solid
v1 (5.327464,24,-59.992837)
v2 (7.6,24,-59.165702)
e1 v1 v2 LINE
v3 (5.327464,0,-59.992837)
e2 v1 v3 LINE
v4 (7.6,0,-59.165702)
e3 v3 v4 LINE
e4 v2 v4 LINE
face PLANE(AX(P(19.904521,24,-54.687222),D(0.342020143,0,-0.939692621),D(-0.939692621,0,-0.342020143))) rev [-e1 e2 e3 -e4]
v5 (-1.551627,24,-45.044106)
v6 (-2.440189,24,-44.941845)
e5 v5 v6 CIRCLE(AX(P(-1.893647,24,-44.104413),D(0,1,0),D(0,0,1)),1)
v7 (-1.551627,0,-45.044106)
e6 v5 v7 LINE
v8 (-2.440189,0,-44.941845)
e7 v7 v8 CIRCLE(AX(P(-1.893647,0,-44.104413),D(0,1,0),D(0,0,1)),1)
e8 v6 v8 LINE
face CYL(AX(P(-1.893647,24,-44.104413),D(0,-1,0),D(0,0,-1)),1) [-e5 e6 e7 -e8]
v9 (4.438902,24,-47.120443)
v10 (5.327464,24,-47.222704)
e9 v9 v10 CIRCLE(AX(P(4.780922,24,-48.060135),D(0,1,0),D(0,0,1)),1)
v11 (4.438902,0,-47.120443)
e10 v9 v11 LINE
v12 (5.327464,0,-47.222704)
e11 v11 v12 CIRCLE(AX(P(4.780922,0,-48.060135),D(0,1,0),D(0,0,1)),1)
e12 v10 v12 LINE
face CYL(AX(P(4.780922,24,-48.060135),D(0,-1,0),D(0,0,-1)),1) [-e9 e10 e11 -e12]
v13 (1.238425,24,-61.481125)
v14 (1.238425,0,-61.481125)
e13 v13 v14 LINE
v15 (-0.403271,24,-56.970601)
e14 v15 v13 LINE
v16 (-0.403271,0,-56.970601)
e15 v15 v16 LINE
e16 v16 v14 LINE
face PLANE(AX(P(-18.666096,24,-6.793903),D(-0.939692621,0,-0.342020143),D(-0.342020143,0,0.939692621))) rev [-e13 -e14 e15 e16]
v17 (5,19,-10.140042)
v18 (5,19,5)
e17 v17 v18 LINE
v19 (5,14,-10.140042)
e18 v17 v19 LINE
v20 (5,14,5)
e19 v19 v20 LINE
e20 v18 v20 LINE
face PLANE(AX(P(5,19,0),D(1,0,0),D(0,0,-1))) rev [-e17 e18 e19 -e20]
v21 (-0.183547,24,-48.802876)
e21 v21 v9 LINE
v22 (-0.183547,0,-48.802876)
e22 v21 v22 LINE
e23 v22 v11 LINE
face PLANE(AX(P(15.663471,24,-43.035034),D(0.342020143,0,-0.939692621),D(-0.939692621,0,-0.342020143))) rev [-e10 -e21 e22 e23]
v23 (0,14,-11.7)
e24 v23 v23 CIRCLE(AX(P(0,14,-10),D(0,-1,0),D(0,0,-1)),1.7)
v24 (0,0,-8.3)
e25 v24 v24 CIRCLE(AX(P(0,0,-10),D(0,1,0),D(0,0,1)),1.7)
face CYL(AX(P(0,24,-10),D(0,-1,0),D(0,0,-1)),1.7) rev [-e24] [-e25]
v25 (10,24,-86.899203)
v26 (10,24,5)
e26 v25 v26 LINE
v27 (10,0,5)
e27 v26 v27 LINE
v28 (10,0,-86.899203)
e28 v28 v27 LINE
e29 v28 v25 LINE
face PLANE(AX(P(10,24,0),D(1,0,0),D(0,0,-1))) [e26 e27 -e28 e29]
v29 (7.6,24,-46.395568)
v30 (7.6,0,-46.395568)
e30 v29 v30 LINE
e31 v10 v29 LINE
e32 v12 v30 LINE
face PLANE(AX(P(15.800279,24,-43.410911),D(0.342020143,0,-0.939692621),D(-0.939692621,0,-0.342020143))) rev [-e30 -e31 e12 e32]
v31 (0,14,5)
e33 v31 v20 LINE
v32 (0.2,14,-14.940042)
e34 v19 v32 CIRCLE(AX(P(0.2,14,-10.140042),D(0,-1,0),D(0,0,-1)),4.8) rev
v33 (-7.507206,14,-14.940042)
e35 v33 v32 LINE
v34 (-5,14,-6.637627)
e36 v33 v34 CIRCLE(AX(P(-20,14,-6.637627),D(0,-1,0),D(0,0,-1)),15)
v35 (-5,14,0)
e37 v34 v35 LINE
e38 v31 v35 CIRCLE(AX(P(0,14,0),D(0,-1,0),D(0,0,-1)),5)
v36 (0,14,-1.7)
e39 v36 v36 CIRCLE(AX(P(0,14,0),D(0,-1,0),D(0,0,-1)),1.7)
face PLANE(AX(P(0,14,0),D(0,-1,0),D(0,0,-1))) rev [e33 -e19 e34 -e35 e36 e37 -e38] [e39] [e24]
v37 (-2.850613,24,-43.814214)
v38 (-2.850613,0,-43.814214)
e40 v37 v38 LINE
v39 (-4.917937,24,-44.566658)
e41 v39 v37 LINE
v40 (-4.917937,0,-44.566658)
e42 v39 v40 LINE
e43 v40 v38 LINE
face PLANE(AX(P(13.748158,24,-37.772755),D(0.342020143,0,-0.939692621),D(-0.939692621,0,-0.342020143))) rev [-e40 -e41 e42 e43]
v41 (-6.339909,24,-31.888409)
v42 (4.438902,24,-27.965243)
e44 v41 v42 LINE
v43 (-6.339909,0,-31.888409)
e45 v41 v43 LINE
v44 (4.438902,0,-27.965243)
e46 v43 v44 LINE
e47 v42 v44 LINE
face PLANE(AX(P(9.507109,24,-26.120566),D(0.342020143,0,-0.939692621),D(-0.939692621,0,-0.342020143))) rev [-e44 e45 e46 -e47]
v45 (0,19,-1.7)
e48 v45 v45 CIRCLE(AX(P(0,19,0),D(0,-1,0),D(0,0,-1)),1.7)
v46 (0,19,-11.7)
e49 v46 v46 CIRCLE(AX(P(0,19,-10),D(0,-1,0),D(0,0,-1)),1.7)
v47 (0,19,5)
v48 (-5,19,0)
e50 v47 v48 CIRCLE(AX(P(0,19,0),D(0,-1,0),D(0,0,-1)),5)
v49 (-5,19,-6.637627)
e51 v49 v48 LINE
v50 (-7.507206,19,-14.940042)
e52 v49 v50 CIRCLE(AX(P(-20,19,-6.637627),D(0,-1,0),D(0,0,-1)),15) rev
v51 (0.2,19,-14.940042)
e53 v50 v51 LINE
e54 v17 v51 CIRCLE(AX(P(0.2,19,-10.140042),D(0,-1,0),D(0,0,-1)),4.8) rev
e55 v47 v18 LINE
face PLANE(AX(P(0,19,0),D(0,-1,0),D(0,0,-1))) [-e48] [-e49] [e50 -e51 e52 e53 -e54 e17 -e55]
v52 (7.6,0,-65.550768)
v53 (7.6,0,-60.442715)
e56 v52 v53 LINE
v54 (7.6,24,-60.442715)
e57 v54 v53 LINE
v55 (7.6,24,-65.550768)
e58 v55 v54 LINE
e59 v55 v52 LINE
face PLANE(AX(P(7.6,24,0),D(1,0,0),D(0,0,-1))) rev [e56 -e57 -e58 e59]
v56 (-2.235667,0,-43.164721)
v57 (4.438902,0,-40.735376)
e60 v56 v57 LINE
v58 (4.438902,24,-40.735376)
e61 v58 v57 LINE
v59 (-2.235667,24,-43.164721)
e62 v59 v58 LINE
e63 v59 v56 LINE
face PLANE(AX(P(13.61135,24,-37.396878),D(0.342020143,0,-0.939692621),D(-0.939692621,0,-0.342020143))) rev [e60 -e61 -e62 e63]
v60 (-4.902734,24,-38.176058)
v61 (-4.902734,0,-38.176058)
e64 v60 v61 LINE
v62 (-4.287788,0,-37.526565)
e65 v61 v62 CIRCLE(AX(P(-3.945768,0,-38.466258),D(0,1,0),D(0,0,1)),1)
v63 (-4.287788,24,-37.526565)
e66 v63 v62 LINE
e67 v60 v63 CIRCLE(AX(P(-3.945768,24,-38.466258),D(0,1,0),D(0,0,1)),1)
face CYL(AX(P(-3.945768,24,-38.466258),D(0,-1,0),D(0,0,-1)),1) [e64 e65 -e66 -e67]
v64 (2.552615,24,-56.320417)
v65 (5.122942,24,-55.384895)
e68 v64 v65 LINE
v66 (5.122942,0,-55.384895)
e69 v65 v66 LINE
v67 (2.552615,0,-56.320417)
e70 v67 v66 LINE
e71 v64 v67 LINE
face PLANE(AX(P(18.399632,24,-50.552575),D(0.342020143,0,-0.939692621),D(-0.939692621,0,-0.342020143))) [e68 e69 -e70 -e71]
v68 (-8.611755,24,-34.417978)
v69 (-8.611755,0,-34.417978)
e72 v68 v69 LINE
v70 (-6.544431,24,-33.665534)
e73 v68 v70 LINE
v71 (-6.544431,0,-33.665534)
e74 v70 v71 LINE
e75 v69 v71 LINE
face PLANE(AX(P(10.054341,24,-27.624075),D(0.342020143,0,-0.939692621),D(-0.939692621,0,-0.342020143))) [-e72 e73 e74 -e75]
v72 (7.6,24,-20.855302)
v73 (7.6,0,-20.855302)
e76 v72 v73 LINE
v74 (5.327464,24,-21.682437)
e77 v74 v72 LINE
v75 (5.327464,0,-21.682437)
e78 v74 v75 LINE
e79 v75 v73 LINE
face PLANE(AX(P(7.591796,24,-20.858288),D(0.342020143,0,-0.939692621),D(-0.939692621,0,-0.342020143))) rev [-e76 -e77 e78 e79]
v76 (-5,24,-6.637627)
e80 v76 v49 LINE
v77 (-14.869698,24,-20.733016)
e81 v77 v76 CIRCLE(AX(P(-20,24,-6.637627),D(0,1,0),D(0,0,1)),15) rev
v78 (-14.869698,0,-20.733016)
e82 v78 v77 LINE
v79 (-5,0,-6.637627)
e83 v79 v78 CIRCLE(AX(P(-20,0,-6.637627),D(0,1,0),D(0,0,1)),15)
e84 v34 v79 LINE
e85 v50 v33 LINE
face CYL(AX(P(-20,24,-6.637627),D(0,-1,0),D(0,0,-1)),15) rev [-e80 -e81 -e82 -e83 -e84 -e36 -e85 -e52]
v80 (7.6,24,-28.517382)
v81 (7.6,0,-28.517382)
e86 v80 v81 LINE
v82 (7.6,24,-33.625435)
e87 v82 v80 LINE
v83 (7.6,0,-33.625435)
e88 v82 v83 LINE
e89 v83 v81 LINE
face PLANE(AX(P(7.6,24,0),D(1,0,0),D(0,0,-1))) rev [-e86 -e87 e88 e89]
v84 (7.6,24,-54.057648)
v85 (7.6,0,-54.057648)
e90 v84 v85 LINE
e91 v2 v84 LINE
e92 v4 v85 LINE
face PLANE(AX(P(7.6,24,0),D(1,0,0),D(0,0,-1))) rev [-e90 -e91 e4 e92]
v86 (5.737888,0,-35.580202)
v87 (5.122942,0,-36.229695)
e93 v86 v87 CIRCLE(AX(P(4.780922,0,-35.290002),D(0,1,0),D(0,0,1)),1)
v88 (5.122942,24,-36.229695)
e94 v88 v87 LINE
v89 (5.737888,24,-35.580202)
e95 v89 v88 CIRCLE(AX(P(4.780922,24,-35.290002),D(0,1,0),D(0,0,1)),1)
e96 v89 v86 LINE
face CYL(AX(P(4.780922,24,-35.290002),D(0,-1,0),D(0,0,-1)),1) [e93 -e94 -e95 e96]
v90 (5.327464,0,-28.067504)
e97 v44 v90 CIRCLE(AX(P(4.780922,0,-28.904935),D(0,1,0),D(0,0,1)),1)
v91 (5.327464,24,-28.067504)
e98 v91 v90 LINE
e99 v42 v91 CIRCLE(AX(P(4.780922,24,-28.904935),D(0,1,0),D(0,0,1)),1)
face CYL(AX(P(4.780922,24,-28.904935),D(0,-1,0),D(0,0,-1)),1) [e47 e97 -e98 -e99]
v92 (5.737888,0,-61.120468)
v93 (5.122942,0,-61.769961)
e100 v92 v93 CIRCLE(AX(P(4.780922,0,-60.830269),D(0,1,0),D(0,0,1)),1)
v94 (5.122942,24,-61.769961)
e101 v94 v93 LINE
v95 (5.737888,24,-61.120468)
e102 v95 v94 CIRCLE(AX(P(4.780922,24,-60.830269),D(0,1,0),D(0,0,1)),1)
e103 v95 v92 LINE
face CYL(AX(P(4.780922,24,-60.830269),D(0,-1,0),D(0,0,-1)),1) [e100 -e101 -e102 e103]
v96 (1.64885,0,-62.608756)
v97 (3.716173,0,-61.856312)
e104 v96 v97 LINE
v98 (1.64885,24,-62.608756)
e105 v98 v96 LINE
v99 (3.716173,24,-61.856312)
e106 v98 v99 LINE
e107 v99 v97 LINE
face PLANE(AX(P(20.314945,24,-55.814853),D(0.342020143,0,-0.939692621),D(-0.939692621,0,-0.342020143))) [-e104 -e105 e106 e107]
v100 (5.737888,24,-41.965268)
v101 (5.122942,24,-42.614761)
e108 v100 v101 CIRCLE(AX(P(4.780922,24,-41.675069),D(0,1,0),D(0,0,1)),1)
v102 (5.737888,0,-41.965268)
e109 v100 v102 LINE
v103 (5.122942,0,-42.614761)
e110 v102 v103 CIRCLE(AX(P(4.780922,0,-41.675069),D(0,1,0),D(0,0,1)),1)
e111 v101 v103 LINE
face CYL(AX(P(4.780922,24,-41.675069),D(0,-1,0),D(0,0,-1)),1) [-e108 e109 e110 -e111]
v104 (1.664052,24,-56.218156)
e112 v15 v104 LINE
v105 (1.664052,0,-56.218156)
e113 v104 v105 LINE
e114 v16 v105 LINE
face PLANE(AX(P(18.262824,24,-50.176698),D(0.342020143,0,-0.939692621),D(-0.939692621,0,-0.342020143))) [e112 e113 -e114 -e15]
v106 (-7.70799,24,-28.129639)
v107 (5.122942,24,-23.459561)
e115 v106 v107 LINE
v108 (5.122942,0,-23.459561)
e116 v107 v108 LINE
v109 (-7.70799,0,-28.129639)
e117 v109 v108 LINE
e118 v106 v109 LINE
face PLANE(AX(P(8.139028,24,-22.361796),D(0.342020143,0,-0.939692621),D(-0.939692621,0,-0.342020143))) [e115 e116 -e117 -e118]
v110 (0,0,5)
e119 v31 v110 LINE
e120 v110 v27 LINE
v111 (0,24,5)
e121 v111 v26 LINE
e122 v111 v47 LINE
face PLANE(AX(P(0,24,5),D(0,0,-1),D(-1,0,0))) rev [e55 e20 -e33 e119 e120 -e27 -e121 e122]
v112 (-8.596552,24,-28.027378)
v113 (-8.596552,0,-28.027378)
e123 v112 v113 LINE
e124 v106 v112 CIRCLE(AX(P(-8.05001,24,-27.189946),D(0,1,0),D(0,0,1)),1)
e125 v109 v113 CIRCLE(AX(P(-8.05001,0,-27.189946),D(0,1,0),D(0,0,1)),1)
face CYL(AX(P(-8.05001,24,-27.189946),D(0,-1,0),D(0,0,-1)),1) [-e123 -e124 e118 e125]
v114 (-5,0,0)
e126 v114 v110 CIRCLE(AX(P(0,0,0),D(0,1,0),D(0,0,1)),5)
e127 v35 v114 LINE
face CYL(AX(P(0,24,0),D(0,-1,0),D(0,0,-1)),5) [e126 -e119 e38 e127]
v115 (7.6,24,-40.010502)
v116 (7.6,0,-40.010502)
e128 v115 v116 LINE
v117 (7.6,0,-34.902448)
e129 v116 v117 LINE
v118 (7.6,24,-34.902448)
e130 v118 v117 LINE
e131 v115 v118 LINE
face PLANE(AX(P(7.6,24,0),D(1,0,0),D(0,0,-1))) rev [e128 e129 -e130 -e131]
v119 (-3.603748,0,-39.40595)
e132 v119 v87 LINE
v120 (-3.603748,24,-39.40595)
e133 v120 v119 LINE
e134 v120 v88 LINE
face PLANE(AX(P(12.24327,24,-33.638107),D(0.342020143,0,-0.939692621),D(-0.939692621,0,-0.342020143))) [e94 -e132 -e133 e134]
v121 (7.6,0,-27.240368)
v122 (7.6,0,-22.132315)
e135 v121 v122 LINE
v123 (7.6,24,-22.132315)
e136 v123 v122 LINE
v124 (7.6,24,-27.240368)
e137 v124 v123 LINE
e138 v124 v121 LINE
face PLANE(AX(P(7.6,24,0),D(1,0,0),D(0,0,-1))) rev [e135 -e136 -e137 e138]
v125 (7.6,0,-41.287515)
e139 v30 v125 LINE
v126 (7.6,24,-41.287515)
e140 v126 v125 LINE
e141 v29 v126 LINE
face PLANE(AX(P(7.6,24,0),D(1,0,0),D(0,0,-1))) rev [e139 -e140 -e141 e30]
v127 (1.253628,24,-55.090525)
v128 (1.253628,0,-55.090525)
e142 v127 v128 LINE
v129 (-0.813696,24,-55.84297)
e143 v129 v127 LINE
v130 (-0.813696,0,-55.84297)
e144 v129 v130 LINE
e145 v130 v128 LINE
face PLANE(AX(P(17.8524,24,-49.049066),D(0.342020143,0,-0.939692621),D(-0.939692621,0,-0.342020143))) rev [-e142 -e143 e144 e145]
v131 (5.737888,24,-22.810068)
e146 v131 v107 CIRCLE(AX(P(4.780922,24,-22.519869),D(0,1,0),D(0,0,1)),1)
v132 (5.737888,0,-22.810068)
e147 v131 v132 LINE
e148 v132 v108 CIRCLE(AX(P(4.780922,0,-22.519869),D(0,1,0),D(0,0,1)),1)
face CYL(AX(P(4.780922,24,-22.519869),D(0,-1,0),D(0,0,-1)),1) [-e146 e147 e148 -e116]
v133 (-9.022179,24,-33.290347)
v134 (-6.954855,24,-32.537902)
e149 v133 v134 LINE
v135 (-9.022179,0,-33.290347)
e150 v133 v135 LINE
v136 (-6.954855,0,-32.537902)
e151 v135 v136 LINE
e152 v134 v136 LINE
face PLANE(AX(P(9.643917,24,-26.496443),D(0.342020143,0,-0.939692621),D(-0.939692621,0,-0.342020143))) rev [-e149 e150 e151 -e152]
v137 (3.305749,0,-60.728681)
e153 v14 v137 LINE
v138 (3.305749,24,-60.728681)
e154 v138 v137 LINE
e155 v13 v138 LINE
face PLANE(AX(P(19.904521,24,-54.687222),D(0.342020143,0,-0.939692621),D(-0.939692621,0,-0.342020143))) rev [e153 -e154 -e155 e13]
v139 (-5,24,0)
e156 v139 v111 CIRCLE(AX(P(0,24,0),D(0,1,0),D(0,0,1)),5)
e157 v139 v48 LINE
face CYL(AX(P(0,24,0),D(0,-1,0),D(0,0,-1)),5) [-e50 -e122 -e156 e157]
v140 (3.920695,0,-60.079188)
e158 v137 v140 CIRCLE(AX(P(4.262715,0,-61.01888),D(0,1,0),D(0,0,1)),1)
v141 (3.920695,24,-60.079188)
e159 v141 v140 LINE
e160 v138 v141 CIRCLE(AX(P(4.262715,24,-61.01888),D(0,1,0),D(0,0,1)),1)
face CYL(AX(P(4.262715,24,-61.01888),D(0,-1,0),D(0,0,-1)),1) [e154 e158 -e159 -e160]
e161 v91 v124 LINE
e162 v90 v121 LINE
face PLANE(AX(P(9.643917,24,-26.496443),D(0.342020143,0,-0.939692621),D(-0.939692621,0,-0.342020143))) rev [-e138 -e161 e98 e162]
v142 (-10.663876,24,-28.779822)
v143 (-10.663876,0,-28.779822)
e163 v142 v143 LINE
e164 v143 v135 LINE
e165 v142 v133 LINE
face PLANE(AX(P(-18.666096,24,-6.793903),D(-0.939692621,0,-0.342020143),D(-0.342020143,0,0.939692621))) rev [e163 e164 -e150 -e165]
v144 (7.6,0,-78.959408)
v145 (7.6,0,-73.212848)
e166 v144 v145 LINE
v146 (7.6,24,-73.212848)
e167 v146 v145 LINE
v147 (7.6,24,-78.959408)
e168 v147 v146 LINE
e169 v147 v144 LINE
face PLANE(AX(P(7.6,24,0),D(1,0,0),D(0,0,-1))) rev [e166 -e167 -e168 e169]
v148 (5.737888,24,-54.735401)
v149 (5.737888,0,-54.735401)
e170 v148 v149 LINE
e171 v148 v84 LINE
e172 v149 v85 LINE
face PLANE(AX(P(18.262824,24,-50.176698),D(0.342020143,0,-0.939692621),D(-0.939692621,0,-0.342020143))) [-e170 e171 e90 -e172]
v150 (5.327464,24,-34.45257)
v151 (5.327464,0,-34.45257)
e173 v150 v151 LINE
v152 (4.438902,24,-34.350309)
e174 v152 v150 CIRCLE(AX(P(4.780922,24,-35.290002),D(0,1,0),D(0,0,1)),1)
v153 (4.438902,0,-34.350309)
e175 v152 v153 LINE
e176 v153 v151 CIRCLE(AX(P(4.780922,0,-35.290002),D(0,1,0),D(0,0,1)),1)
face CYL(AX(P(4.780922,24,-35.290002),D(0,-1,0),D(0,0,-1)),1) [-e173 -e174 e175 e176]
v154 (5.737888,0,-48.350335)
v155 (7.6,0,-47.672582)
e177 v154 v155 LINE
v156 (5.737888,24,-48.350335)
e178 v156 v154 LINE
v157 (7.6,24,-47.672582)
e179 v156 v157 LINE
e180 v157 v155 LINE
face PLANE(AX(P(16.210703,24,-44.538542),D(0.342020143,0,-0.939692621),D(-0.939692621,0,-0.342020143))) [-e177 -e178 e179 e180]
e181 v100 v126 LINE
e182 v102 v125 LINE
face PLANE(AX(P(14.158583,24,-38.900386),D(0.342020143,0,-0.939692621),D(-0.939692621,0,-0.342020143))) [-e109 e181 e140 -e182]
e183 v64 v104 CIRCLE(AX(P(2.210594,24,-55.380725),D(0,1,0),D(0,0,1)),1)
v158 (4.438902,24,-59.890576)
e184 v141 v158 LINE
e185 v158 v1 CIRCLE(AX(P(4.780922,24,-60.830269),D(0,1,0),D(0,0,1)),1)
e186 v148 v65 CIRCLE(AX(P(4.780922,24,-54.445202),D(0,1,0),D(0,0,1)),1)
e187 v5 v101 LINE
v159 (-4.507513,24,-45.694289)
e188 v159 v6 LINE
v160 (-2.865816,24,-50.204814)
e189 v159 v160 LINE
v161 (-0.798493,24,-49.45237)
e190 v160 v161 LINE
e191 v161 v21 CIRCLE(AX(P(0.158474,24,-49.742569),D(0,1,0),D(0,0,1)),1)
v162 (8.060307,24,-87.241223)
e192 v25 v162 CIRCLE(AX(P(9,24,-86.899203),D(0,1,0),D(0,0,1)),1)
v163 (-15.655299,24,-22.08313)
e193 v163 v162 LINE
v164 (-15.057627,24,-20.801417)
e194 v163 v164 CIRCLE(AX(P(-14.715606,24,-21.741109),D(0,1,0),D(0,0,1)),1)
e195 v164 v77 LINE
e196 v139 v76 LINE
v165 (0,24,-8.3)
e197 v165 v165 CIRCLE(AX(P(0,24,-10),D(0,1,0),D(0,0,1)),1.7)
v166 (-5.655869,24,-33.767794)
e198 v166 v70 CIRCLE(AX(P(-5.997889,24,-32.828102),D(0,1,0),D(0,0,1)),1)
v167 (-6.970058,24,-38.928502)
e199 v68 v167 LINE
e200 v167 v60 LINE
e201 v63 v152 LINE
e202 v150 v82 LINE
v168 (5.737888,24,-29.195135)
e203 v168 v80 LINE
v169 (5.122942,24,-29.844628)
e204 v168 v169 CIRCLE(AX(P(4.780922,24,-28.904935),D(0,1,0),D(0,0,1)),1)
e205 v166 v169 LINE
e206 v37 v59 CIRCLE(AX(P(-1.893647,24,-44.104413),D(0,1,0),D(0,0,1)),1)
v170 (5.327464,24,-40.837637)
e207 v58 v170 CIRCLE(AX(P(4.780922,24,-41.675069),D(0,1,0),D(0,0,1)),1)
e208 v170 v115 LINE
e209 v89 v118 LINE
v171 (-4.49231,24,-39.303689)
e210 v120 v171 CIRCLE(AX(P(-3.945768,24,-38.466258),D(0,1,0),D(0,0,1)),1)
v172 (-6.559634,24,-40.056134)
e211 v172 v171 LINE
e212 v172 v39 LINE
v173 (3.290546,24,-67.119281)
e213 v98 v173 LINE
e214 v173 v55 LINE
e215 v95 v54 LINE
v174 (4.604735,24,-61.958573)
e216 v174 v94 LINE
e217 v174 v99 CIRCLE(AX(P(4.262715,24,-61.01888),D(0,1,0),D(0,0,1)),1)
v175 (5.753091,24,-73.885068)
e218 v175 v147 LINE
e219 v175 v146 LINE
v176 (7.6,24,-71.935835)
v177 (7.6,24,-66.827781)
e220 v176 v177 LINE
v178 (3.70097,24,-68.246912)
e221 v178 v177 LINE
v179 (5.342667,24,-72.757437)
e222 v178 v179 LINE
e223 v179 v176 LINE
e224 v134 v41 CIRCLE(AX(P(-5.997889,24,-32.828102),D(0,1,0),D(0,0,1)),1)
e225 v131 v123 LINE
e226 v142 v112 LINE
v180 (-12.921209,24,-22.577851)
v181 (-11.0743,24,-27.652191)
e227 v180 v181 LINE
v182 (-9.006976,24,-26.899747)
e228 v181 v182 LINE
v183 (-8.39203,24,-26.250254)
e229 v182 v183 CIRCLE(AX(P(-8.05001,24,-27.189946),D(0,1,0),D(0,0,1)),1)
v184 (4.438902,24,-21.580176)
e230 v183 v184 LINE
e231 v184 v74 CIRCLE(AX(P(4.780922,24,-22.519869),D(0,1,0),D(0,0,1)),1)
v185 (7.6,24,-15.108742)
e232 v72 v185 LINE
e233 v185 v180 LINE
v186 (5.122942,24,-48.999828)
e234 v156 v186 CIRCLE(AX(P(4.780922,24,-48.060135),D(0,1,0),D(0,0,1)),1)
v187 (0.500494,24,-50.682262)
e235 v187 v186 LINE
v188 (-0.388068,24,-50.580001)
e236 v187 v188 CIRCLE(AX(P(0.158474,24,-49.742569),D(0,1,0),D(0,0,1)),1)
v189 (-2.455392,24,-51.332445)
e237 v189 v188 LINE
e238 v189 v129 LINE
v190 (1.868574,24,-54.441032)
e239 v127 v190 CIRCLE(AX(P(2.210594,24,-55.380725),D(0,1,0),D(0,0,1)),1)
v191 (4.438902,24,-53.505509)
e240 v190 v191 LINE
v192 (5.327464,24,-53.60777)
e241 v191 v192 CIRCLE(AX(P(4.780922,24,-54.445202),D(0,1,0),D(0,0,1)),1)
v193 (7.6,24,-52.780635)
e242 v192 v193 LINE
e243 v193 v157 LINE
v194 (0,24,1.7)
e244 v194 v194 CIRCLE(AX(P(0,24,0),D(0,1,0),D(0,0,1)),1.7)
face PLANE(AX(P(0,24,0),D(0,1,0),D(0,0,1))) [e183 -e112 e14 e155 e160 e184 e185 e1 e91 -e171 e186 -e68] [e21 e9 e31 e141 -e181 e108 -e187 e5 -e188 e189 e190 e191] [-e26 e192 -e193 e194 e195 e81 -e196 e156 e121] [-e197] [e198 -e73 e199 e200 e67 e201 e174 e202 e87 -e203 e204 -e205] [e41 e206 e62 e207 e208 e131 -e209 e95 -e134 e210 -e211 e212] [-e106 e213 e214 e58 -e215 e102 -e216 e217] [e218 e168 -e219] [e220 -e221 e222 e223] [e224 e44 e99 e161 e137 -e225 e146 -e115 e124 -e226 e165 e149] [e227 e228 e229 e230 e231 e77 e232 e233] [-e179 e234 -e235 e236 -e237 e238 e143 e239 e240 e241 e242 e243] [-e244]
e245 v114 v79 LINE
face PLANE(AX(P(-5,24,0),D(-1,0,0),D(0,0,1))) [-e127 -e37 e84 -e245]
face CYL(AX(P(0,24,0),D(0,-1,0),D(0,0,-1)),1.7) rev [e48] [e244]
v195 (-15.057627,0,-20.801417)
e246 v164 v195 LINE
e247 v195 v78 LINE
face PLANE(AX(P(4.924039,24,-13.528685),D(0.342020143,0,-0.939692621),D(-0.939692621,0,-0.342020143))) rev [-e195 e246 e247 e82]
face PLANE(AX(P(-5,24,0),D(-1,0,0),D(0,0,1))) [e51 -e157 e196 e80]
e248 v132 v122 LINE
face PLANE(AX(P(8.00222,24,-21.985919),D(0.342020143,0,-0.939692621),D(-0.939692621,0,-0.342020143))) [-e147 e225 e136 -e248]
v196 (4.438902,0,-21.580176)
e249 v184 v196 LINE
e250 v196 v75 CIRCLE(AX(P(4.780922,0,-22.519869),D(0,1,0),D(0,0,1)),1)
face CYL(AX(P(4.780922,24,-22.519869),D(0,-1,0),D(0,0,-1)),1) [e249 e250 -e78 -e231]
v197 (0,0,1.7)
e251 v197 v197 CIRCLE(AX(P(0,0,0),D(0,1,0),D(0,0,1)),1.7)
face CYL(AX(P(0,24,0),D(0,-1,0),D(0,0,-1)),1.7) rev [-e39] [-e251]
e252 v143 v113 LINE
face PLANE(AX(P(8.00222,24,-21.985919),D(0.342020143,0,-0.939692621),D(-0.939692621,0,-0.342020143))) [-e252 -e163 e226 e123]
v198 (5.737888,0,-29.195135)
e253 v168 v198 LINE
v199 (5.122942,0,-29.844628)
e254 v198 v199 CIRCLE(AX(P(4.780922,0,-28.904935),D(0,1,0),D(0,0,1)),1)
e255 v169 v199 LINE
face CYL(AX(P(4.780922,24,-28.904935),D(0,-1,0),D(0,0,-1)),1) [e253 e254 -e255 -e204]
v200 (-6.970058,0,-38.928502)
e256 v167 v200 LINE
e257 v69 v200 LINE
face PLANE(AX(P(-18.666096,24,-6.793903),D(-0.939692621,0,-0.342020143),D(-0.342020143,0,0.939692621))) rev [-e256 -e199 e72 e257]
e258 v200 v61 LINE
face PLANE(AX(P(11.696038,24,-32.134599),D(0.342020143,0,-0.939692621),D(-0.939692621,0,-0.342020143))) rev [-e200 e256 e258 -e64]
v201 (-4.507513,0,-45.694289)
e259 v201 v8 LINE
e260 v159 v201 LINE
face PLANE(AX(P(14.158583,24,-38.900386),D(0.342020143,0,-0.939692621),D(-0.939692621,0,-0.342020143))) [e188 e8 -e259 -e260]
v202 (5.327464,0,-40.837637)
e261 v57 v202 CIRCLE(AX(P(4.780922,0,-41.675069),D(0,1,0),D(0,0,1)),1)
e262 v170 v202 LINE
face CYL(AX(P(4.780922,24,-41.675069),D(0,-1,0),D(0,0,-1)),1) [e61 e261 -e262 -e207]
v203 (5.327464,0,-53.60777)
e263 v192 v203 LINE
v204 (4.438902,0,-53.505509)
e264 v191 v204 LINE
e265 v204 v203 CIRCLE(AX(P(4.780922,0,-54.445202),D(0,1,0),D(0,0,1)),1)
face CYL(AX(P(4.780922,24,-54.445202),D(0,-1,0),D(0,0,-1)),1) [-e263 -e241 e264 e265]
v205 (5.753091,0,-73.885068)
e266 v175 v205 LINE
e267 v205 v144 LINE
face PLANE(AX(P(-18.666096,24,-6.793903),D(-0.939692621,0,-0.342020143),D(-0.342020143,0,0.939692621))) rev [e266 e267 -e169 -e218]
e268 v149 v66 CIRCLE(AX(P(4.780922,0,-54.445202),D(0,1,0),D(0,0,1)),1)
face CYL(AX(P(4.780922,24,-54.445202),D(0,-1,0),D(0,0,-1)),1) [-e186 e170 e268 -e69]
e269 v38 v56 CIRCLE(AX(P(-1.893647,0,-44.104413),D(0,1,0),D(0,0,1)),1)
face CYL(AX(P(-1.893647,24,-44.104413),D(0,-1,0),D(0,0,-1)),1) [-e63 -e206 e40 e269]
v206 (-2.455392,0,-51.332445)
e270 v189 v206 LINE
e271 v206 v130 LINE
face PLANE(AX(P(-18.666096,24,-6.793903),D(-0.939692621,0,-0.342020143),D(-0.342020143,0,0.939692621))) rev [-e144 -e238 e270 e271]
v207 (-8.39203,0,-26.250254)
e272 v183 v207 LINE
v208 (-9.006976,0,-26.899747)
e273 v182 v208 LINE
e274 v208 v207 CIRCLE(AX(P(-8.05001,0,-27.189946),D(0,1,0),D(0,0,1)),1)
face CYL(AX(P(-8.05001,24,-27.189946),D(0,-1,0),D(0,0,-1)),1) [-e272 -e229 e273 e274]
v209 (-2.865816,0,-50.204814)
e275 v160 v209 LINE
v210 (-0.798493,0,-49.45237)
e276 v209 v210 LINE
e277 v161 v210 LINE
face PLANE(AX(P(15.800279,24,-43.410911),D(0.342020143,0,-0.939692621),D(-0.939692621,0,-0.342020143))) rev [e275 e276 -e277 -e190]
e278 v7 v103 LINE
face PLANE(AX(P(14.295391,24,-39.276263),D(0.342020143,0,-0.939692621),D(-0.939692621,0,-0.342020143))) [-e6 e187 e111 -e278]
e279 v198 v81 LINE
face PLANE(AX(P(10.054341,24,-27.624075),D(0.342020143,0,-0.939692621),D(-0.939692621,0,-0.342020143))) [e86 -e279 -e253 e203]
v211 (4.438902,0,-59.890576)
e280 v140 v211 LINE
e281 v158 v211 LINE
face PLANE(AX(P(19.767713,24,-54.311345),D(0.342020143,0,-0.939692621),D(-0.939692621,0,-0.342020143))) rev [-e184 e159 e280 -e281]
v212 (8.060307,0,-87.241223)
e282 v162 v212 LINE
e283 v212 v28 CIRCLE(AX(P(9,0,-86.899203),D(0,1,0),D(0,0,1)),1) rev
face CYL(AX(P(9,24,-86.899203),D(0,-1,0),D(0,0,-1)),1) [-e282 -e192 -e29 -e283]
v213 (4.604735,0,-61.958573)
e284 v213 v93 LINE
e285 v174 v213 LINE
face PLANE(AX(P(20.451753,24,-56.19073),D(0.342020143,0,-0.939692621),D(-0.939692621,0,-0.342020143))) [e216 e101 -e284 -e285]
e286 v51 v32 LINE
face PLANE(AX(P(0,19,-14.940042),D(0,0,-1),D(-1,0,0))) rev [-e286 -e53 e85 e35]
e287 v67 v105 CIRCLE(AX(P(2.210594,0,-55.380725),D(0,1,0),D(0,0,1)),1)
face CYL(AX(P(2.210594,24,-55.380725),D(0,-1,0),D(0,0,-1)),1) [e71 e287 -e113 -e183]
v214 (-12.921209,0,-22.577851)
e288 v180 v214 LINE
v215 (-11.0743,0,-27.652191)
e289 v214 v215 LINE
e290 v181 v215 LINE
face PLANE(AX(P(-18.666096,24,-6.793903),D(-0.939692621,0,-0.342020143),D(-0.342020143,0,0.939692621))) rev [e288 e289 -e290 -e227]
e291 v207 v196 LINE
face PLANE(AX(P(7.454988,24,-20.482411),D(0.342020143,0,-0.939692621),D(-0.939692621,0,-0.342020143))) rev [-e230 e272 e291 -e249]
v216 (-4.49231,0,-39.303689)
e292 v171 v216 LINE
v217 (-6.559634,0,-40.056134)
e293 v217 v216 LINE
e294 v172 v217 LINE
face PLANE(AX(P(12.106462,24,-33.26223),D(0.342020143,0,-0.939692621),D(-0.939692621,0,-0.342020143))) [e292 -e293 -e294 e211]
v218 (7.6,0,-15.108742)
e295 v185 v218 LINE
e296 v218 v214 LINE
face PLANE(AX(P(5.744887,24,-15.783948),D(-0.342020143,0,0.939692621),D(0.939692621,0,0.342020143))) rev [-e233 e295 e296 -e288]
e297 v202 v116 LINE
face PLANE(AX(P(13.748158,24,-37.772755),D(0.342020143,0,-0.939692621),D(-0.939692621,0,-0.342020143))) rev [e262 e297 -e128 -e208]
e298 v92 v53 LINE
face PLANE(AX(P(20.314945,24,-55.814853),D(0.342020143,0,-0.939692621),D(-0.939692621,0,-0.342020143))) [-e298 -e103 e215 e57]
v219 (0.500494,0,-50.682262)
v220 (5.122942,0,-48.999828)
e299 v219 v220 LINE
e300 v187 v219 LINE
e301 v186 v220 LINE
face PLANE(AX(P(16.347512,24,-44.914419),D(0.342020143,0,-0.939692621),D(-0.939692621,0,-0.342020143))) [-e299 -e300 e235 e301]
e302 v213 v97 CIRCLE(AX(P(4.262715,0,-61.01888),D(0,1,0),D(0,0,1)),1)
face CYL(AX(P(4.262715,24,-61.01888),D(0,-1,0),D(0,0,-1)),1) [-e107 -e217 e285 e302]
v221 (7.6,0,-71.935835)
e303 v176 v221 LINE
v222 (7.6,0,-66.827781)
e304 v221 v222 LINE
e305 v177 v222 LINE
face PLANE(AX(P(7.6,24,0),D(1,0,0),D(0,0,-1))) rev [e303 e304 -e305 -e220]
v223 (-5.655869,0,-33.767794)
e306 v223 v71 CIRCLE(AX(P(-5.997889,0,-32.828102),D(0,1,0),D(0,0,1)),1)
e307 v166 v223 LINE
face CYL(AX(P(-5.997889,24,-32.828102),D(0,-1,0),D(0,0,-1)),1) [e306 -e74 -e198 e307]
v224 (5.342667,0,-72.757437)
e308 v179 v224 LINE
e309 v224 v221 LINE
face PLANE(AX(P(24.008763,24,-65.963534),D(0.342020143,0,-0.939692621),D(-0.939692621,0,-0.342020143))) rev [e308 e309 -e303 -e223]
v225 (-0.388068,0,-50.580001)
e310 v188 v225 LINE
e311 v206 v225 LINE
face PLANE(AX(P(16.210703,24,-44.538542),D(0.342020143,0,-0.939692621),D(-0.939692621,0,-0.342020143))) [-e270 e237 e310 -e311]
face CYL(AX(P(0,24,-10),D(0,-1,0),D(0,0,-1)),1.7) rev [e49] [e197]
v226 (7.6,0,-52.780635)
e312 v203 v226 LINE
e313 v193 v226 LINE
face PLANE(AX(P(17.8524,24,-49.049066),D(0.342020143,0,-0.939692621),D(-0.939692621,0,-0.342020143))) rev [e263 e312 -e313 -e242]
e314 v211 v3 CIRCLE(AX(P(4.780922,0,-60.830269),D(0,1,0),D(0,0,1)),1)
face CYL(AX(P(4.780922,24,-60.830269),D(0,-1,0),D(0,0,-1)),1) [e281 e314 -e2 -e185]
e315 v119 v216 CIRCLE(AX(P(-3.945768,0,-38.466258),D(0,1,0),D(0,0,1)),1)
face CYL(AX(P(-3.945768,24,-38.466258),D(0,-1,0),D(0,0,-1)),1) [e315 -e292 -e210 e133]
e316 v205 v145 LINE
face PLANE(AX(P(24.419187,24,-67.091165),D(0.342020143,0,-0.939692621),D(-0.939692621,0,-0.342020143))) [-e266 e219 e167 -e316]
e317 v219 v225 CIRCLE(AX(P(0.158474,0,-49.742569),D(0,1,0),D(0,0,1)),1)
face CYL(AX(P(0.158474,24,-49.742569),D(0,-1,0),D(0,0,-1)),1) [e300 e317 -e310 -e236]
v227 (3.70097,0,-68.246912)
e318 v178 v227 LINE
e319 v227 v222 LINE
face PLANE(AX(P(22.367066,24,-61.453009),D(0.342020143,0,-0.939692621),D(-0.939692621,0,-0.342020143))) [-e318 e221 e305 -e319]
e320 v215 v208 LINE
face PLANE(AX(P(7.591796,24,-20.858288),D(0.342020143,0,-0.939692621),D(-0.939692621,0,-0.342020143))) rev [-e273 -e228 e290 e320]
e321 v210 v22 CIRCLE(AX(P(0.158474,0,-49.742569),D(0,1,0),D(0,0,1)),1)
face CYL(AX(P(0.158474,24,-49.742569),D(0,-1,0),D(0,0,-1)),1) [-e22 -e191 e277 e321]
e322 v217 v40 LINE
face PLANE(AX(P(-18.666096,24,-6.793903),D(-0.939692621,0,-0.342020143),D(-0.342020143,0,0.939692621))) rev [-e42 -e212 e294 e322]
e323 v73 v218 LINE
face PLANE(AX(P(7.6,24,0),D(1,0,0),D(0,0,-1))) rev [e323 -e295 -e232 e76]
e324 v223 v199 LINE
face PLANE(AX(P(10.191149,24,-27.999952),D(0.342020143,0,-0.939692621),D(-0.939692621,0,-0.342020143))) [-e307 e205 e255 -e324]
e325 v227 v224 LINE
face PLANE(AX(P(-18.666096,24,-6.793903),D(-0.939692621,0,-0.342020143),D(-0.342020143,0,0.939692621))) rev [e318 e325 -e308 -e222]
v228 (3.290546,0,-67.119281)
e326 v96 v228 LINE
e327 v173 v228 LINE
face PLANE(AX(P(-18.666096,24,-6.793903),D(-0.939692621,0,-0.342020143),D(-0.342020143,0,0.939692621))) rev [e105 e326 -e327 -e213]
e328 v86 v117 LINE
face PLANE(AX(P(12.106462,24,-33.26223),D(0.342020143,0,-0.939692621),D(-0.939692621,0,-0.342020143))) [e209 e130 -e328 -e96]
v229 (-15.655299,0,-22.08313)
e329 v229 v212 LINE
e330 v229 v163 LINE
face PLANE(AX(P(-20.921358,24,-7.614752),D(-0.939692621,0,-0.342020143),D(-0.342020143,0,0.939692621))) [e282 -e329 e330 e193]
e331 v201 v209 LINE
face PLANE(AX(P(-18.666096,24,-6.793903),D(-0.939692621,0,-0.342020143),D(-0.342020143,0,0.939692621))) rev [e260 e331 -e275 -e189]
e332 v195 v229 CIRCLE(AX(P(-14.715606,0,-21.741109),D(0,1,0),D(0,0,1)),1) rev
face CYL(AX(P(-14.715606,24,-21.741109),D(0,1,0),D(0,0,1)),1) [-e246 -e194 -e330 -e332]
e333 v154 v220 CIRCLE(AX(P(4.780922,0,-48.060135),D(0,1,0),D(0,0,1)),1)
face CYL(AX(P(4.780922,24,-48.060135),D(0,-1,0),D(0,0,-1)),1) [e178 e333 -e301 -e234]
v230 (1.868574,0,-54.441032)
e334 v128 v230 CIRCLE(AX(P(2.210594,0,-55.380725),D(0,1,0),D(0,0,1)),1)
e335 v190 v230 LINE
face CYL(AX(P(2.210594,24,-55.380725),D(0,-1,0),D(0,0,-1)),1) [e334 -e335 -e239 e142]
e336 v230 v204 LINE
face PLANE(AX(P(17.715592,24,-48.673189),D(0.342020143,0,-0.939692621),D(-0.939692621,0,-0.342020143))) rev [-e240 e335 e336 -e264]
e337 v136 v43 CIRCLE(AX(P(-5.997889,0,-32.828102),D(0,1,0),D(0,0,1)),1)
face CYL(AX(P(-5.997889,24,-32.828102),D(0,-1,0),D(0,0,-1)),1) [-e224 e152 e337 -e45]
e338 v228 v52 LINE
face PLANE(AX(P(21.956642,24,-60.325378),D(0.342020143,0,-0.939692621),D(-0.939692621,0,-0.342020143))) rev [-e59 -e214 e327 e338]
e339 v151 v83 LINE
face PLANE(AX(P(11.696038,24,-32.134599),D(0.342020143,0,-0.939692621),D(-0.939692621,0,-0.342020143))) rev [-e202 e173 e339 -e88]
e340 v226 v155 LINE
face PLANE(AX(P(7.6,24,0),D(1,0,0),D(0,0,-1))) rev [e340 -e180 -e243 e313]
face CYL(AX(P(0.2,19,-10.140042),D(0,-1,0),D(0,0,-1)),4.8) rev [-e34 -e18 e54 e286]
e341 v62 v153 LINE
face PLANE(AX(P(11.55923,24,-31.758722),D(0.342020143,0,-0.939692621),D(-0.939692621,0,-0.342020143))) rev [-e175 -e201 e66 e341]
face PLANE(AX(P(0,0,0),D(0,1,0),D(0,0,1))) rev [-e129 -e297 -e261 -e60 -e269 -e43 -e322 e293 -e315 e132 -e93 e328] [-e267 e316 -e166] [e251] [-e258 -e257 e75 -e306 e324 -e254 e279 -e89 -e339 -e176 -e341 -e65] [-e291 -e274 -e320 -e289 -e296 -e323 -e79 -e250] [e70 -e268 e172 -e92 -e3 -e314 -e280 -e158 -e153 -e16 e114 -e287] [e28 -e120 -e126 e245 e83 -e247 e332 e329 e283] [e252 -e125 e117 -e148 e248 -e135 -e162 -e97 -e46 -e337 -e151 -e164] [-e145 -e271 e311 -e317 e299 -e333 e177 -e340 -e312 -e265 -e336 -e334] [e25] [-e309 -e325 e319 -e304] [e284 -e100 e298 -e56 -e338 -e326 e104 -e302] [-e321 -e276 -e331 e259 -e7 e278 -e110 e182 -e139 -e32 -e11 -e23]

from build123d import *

# Parameters (mm, degrees)
SKETCH_1_R          = 1.7
EXTRUDE_1_DEPTH     = 24
CUT_EXTRUDE_START   = -14
SKETCH_2_R          = 1.7
CUT_EXTRUDE_1_DEPTH = 5
FILLET_1_R          = 1
FILLET_2_R          = 15


with BuildPart() as part:
    # 草图1 → 凸台-拉伸1 (new body)
    with BuildSketch(Plane(origin=(0, 0, 0), x_dir=(1, 0, 0), z_dir=(0, 1, 0))):
        with BuildLine():
            Line((-5, 17.140740034), (-5, 0))
            ThreePointArc((-5, 0), (-3.535533906, -3.535533906), (0, -5))
            Line((0, -5), (10, -5))
            Line((10, -5), (10, 92.570484452))
            Line((10, 92.570484452), (-15.997319233, 21.143436891))
            Line((-15.997319233, 21.143436891), (-5, 17.140740034))
        make_face()
        with Locations(Location((0, 0, 0), (0, 0, 270))):
            Circle(SKETCH_1_R, mode=Mode.SUBTRACT)
        with Locations(Location((0, 10, 0), (0, 0, 270))):
            Circle(SKETCH_1_R, mode=Mode.SUBTRACT)
        with BuildLine():
            Line((7.6, 15.108741736), (-12.9212086, 22.577850837))
            Line((-12.9212086, 22.577850837), (-11.074299826, 27.65219099))
            Line((-11.074299826, 27.65219099), (-9.00697606, 26.899746674))
            ThreePointArc((-9.00697606, 26.899746674), (-8.776165309, 26.502415559), (-8.392030021, 26.250253511))
            Line((-8.392030021, 26.250253511), (4.438901994, 21.58017618))
            ThreePointArc((4.438901994, 21.58017618), (4.895253337, 21.526426111), (5.327464148, 21.682437114))
            Line((5.327464148, 21.682437114), (7.6, 20.855301707))
            Line((7.6, 20.855301707), (7.6, 15.108741736))
        make_face(mode=Mode.SUBTRACT)
        with BuildLine():
            ThreePointArc((5.73788832, 22.810068259), (5.507077569, 23.207399374), (5.122942281, 23.459561422))
            Line((5.122942281, 23.459561422), (-7.707989734, 28.129638753))
            ThreePointArc((-7.707989734, 28.129638753), (-8.164341077, 28.183388821), (-8.596551888, 28.027377819))
            Line((-8.596551888, 28.027377819), (-10.663875654, 28.779822134))
            Line((-10.663875654, 28.779822134), (-9.022178966, 33.290346714))
            Line((-9.022178966, 33.290346714), (-6.9548552, 32.537902399))
            ThreePointArc((-6.9548552, 32.537902399), (-6.724044449, 32.140571284), (-6.339909161, 31.888409236))
            Line((-6.339909161, 31.888409236), (4.438901994, 27.965242815))
            ThreePointArc((4.438901994, 27.965242815), (4.895253337, 27.911492746), (5.327464148, 28.067503748))
            Line((5.327464148, 28.067503748), (7.6, 27.240368342))
            Line((7.6, 27.240368342), (7.6, 22.132315034))
            Line((7.6, 22.132315034), (5.73788832, 22.810068259))
        make_face(mode=Mode.SUBTRACT)
        with BuildLine():
            ThreePointArc((5.73788832, 29.195134893), (5.507077569, 29.592466009), (5.122942281, 29.844628056))
            Line((5.122942281, 29.844628056), (-5.655868874, 33.767794478))
            ThreePointArc((-5.655868874, 33.767794478), (-6.112220217, 33.821544546), (-6.544431028, 33.665533544))
            Line((-6.544431028, 33.665533544), (-8.611754794, 34.417977859))
            Line((-8.611754794, 34.417977859), (-6.970058106, 38.928502439))
            Line((-6.970058106, 38.928502439), (-4.90273434, 38.176058124))
            ThreePointArc((-4.90273434, 38.176058124), (-4.671923589, 37.778727008), (-4.287788301, 37.526564961))
            Line((-4.287788301, 37.526564961), (4.438901994, 34.35030945))
            ThreePointArc((4.438901994, 34.35030945), (4.895253337, 34.296559381), (5.327464148, 34.452570383))
            Line((5.327464148, 34.452570383), (7.6, 33.625434977))
            Line((7.6, 33.625434977), (7.6, 28.517381669))
            Line((7.6, 28.517381669), (5.73788832, 29.195134893))
        make_face(mode=Mode.SUBTRACT)
        with BuildLine():
            ThreePointArc((5.73788832, 35.580201528), (5.507077569, 35.977532644), (5.122942281, 36.229694691))
            Line((5.122942281, 36.229694691), (-3.603748014, 39.405950202))
            ThreePointArc((-3.603748014, 39.405950202), (-4.060099357, 39.459700271), (-4.492310168, 39.303689269))
            Line((-4.492310168, 39.303689269), (-6.559633934, 40.056133584))
            Line((-6.559633934, 40.056133584), (-4.917937246, 44.566658164))
            Line((-4.917937246, 44.566658164), (-2.85061348, 43.814213848))
            ThreePointArc((-2.85061348, 43.814213848), (-2.619802729, 43.416882733), (-2.235667441, 43.164720685))
            Line((-2.235667441, 43.164720685), (4.438901994, 40.735376085))
            ThreePointArc((4.438901994, 40.735376085), (4.895253337, 40.681626016), (5.327464148, 40.837637018))
            Line((5.327464148, 40.837637018), (7.6, 40.010501612))
            Line((7.6, 40.010501612), (7.6, 34.902448304))
            Line((7.6, 34.902448304), (5.73788832, 35.580201528))
        make_face(mode=Mode.SUBTRACT)
        with BuildLine():
            ThreePointArc((5.73788832, 41.965268163), (5.507077569, 42.362599278), (5.122942281, 42.614761326))
            Line((5.122942281, 42.614761326), (-1.551627154, 45.044105927))
            ThreePointArc((-1.551627154, 45.044105927), (-2.007978497, 45.097855995), (-2.440189308, 44.941844993))
            Line((-2.440189308, 44.941844993), (-4.507513074, 45.694289309))
            Line((-4.507513074, 45.694289309), (-2.865816386, 50.204813888))
            Line((-2.865816386, 50.204813888), (-0.79849262, 49.452369573))
            ThreePointArc((-0.79849262, 49.452369573), (-0.567681869, 49.055038458), (-0.183546581, 48.80287641))
            Line((-0.183546581, 48.80287641), (4.438901994, 47.120442719))
            ThreePointArc((4.438901994, 47.120442719), (4.895253337, 47.066692651), (5.327464148, 47.222703653))
            Line((5.327464148, 47.222703653), (7.6, 46.395568247))
            Line((7.6, 46.395568247), (7.6, 41.287514939))
            Line((7.6, 41.287514939), (5.73788832, 41.965268163))
        make_face(mode=Mode.SUBTRACT)
        with BuildLine():
            ThreePointArc((5.73788832, 48.350334798), (5.507077569, 48.747665913), (5.122942281, 48.999827961))
            Line((5.122942281, 48.999827961), (0.500493706, 50.682261652))
            ThreePointArc((0.500493706, 50.682261652), (0.044142363, 50.73601172), (-0.388068448, 50.580000718))
            Line((-0.388068448, 50.580000718), (-2.455392214, 51.332445033))
            Line((-2.455392214, 51.332445033), (-0.813695526, 55.842969613))
            Line((-0.813695526, 55.842969613), (1.25362824, 55.090525298))
            ThreePointArc((1.25362824, 55.090525298), (1.484438991, 54.693194182), (1.868574279, 54.441032135))
            Line((1.868574279, 54.441032135), (4.438901994, 53.505509354))
            ThreePointArc((4.438901994, 53.505509354), (4.895253337, 53.451759286), (5.327464148, 53.607770288))
            Line((5.327464148, 53.607770288), (7.6, 52.780634882))
            Line((7.6, 52.780634882), (7.6, 47.672581574))
            Line((7.6, 47.672581574), (5.73788832, 48.350334798))
        make_face(mode=Mode.SUBTRACT)
        with BuildLine():
            ThreePointArc((5.73788832, 54.735401433), (5.507077569, 55.132732548), (5.122942281, 55.384894596))
            Line((5.122942281, 55.384894596), (2.552614566, 56.320417376))
            ThreePointArc((2.552614566, 56.320417376), (2.096263223, 56.374167445), (1.664052412, 56.218156443))
            Line((1.664052412, 56.218156443), (-0.403271354, 56.970600758))
            Line((-0.403271354, 56.970600758), (1.238425334, 61.481125338))
            Line((1.238425334, 61.481125338), (3.3057491, 60.728681023))
            ThreePointArc((3.3057491, 60.728681023), (3.536559851, 60.331349907), (3.920695139, 60.07918786))
            Line((3.920695139, 60.07918786), (4.438901994, 59.890575989))
            ThreePointArc((4.438901994, 59.890575989), (4.895253337, 59.836825921), (5.327464148, 59.992836923))
            Line((5.327464148, 59.992836923), (7.6, 59.165701516))
            Line((7.6, 59.165701516), (7.6, 54.057648209))
            Line((7.6, 54.057648209), (5.73788832, 54.735401433))
        make_face(mode=Mode.SUBTRACT)
        with BuildLine():
            ThreePointArc((5.73788832, 61.120468068), (5.507077569, 61.517799183), (5.122942281, 61.769961231))
            Line((5.122942281, 61.769961231), (4.604735426, 61.958573101))
            ThreePointArc((4.604735426, 61.958573101), (4.148384083, 62.01232317), (3.716173272, 61.856312167))
            Line((3.716173272, 61.856312167), (1.648849506, 62.608756483))
            Line((1.648849506, 62.608756483), (3.290546194, 67.119281063))
            Line((3.290546194, 67.119281063), (7.6, 65.550768151))
            Line((7.6, 65.550768151), (7.6, 60.442714843))
            Line((7.6, 60.442714843), (5.73788832, 61.120468068))
        make_face(mode=Mode.SUBTRACT)
        Polygon((3.700970366, 68.246912207), (5.342667054, 72.757436787), (7.6, 71.935834786), (7.6, 66.827781478), align=None, mode=Mode.SUBTRACT)
        Polygon((5.753091226, 73.885067932), (7.6, 78.959408084), (7.6, 73.212848113), align=None, mode=Mode.SUBTRACT)
    extrude(amount=EXTRUDE_1_DEPTH)

    # 草图2 → 切除-拉伸1 (cut)
    with BuildSketch(Plane.XZ.offset(CUT_EXTRUDE_START)):
        with BuildLine():
            Line((-5, 5), (-5, -14.940041508))
            Line((-5, -14.940041508), (0.2, -14.940041508))
            ThreePointArc((0.2, -14.940041508), (3.59411255, -13.534154057), (5, -10.140041508))
            Line((5, -10.140041508), (5, 5))
            Line((5, 5), (-5, 5))
        make_face()
        with Locations(Location((0, -10, 0), (0, 0, 270))):
            Circle(SKETCH_2_R, mode=Mode.SUBTRACT)
        with Locations(Location((0, 0, 0), (0, 0, 270))):
            Circle(SKETCH_2_R, mode=Mode.SUBTRACT)
    extrude(amount=-CUT_EXTRUDE_1_DEPTH, mode=Mode.SUBTRACT)

    # 圆角1
    fillet_1_edges = [part.edges().sort_by_distance(p)[0] for p in [
        (-15.997319233, 12, -21.143436891),
        (10, 12, -92.570484452),
    ]]
    fillet(fillet_1_edges, radius=FILLET_1_R)

    # 圆角2
    # the kernel refuses this fillet: 15 mm, written as the material it adds along each edge
    with BuildSketch(Plane(origin=(-5, 0, -17.140740034), x_dir=(-0.9396926207859096, 0, -0.34202014332566527), z_dir=(0, 1, 0))) as fillet_2_piece_1_section:
        with BuildLine():
            CenterArc((FILLET_2_R * 0.70020753821, FILLET_2_R), FILLET_2_R, 200, 70)
            Line((-FILLET_2_R * 0.239485082576, FILLET_2_R * 0.657979856674), (0, 0))
            Line((0, 0), (FILLET_2_R * 0.70020753821, 0))
        make_face()
    fillet_2_piece_1 = extrude(amount=24, mode=Mode.PRIVATE)
    fillet_2_piece_1 = split(fillet_2_piece_1, bisect_by=Plane(origin=(-8.048588234, 14, -17.376417802), z_dir=(0, -1, 0)), keep=Keep.TOP, mode=Mode.PRIVATE)
    fillet_2_piece_1 = split(fillet_2_piece_1, bisect_by=Plane(origin=(-8.048588234, 7, -14.940041508), z_dir=(0, 0, -1)), keep=Keep.TOP, mode=Mode.PRIVATE)
    add(fillet_2_piece_1)
    with BuildSketch(Plane(origin=(-5, 0, -17.140740034), x_dir=(-0.9396926207859096, 0, -0.34202014332566527), z_dir=(0, 1, 0))) as fillet_2_piece_2_section:
        with BuildLine():
            CenterArc((FILLET_2_R * 0.70020753821, FILLET_2_R), FILLET_2_R, 200, 70)
            Line((-FILLET_2_R * 0.239485082576, FILLET_2_R * 0.657979856674), (0, 0))
            Line((0, 0), (FILLET_2_R * 0.70020753821, 0))
        make_face()
    fillet_2_piece_2 = extrude(amount=24, mode=Mode.PRIVATE)
    fillet_2_piece_2 = split(fillet_2_piece_2, bisect_by=Plane(origin=(-5.498513848, 14, -12.327693201), z_dir=(0, -1, 0)), keep=Keep.TOP, mode=Mode.PRIVATE)
    fillet_2_piece_2 = split(fillet_2_piece_2, bisect_by=Plane(origin=(-5.498513848, 7, -14.940041508), z_dir=(0, 0, 1)), keep=Keep.TOP, mode=Mode.PRIVATE)
    add(fillet_2_piece_2)
    with BuildSketch(Plane(origin=(-5, 0, -17.140740034), x_dir=(-0.9396926207859096, 0, -0.34202014332566527), z_dir=(0, 1, 0))) as fillet_2_piece_3_section:
        with BuildLine():
            CenterArc((FILLET_2_R * 0.70020753821, FILLET_2_R), FILLET_2_R, 200, 70)
            Line((-FILLET_2_R * 0.239485082576, FILLET_2_R * 0.657979856674), (0, 0))
            Line((0, 0), (FILLET_2_R * 0.70020753821, 0))
        make_face()
    fillet_2_piece_3 = extrude(amount=24, mode=Mode.PRIVATE)
    fillet_2_piece_3 = split(fillet_2_piece_3, bisect_by=Plane(origin=(-8.048588234, 14, -17.376417802), z_dir=(0, 1, 0)), keep=Keep.TOP, mode=Mode.PRIVATE)
    fillet_2_piece_3 = split(fillet_2_piece_3, bisect_by=Plane(origin=(-8.048588234, 16.5, -14.940041508), z_dir=(0, 0, -1)), keep=Keep.TOP, mode=Mode.PRIVATE)
    fillet_2_piece_3 = split(fillet_2_piece_3, bisect_by=Plane(origin=(-8.048588234, 19, -17.376417802), z_dir=(0, -1, 0)), keep=Keep.TOP, mode=Mode.PRIVATE)
    add(fillet_2_piece_3)
    with BuildSketch(Plane(origin=(-5, 0, -17.140740034), x_dir=(-0.9396926207859096, 0, -0.34202014332566527), z_dir=(0, 1, 0))) as fillet_2_piece_4_section:
        with BuildLine():
            CenterArc((FILLET_2_R * 0.70020753821, FILLET_2_R), FILLET_2_R, 200, 70)
            Line((-FILLET_2_R * 0.239485082576, FILLET_2_R * 0.657979856674), (0, 0))
            Line((0, 0), (FILLET_2_R * 0.70020753821, 0))
        make_face()
    fillet_2_piece_4 = extrude(amount=24, mode=Mode.PRIVATE)
    fillet_2_piece_4 = split(fillet_2_piece_4, bisect_by=Plane(origin=(-8.048588234, 21.5, -14.940041508), z_dir=(0, 0, -1)), keep=Keep.TOP, mode=Mode.PRIVATE)
    fillet_2_piece_4 = split(fillet_2_piece_4, bisect_by=Plane(origin=(-8.048588234, 19, -17.376417802), z_dir=(0, 1, 0)), keep=Keep.TOP, mode=Mode.PRIVATE)
    add(fillet_2_piece_4)
    with BuildSketch(Plane(origin=(-5, 0, -17.140740034), x_dir=(-0.9396926207859096, 0, -0.34202014332566527), z_dir=(0, 1, 0))) as fillet_2_piece_5_section:
        with BuildLine():
            CenterArc((FILLET_2_R * 0.70020753821, FILLET_2_R), FILLET_2_R, 200, 70)
            Line((-FILLET_2_R * 0.239485082576, FILLET_2_R * 0.657979856674), (0, 0))
            Line((0, 0), (FILLET_2_R * 0.70020753821, 0))
        make_face()
    fillet_2_piece_5 = extrude(amount=24, mode=Mode.PRIVATE)
    fillet_2_piece_5 = split(fillet_2_piece_5, bisect_by=Plane(origin=(-5.498513848, 21.5, -14.940041508), z_dir=(0, 0, 1)), keep=Keep.TOP, mode=Mode.PRIVATE)
    fillet_2_piece_5 = split(fillet_2_piece_5, bisect_by=Plane(origin=(-5.498513848, 19, -12.327693201), z_dir=(0, 1, 0)), keep=Keep.TOP, mode=Mode.PRIVATE)
    add(fillet_2_piece_5)


solid = part.part
